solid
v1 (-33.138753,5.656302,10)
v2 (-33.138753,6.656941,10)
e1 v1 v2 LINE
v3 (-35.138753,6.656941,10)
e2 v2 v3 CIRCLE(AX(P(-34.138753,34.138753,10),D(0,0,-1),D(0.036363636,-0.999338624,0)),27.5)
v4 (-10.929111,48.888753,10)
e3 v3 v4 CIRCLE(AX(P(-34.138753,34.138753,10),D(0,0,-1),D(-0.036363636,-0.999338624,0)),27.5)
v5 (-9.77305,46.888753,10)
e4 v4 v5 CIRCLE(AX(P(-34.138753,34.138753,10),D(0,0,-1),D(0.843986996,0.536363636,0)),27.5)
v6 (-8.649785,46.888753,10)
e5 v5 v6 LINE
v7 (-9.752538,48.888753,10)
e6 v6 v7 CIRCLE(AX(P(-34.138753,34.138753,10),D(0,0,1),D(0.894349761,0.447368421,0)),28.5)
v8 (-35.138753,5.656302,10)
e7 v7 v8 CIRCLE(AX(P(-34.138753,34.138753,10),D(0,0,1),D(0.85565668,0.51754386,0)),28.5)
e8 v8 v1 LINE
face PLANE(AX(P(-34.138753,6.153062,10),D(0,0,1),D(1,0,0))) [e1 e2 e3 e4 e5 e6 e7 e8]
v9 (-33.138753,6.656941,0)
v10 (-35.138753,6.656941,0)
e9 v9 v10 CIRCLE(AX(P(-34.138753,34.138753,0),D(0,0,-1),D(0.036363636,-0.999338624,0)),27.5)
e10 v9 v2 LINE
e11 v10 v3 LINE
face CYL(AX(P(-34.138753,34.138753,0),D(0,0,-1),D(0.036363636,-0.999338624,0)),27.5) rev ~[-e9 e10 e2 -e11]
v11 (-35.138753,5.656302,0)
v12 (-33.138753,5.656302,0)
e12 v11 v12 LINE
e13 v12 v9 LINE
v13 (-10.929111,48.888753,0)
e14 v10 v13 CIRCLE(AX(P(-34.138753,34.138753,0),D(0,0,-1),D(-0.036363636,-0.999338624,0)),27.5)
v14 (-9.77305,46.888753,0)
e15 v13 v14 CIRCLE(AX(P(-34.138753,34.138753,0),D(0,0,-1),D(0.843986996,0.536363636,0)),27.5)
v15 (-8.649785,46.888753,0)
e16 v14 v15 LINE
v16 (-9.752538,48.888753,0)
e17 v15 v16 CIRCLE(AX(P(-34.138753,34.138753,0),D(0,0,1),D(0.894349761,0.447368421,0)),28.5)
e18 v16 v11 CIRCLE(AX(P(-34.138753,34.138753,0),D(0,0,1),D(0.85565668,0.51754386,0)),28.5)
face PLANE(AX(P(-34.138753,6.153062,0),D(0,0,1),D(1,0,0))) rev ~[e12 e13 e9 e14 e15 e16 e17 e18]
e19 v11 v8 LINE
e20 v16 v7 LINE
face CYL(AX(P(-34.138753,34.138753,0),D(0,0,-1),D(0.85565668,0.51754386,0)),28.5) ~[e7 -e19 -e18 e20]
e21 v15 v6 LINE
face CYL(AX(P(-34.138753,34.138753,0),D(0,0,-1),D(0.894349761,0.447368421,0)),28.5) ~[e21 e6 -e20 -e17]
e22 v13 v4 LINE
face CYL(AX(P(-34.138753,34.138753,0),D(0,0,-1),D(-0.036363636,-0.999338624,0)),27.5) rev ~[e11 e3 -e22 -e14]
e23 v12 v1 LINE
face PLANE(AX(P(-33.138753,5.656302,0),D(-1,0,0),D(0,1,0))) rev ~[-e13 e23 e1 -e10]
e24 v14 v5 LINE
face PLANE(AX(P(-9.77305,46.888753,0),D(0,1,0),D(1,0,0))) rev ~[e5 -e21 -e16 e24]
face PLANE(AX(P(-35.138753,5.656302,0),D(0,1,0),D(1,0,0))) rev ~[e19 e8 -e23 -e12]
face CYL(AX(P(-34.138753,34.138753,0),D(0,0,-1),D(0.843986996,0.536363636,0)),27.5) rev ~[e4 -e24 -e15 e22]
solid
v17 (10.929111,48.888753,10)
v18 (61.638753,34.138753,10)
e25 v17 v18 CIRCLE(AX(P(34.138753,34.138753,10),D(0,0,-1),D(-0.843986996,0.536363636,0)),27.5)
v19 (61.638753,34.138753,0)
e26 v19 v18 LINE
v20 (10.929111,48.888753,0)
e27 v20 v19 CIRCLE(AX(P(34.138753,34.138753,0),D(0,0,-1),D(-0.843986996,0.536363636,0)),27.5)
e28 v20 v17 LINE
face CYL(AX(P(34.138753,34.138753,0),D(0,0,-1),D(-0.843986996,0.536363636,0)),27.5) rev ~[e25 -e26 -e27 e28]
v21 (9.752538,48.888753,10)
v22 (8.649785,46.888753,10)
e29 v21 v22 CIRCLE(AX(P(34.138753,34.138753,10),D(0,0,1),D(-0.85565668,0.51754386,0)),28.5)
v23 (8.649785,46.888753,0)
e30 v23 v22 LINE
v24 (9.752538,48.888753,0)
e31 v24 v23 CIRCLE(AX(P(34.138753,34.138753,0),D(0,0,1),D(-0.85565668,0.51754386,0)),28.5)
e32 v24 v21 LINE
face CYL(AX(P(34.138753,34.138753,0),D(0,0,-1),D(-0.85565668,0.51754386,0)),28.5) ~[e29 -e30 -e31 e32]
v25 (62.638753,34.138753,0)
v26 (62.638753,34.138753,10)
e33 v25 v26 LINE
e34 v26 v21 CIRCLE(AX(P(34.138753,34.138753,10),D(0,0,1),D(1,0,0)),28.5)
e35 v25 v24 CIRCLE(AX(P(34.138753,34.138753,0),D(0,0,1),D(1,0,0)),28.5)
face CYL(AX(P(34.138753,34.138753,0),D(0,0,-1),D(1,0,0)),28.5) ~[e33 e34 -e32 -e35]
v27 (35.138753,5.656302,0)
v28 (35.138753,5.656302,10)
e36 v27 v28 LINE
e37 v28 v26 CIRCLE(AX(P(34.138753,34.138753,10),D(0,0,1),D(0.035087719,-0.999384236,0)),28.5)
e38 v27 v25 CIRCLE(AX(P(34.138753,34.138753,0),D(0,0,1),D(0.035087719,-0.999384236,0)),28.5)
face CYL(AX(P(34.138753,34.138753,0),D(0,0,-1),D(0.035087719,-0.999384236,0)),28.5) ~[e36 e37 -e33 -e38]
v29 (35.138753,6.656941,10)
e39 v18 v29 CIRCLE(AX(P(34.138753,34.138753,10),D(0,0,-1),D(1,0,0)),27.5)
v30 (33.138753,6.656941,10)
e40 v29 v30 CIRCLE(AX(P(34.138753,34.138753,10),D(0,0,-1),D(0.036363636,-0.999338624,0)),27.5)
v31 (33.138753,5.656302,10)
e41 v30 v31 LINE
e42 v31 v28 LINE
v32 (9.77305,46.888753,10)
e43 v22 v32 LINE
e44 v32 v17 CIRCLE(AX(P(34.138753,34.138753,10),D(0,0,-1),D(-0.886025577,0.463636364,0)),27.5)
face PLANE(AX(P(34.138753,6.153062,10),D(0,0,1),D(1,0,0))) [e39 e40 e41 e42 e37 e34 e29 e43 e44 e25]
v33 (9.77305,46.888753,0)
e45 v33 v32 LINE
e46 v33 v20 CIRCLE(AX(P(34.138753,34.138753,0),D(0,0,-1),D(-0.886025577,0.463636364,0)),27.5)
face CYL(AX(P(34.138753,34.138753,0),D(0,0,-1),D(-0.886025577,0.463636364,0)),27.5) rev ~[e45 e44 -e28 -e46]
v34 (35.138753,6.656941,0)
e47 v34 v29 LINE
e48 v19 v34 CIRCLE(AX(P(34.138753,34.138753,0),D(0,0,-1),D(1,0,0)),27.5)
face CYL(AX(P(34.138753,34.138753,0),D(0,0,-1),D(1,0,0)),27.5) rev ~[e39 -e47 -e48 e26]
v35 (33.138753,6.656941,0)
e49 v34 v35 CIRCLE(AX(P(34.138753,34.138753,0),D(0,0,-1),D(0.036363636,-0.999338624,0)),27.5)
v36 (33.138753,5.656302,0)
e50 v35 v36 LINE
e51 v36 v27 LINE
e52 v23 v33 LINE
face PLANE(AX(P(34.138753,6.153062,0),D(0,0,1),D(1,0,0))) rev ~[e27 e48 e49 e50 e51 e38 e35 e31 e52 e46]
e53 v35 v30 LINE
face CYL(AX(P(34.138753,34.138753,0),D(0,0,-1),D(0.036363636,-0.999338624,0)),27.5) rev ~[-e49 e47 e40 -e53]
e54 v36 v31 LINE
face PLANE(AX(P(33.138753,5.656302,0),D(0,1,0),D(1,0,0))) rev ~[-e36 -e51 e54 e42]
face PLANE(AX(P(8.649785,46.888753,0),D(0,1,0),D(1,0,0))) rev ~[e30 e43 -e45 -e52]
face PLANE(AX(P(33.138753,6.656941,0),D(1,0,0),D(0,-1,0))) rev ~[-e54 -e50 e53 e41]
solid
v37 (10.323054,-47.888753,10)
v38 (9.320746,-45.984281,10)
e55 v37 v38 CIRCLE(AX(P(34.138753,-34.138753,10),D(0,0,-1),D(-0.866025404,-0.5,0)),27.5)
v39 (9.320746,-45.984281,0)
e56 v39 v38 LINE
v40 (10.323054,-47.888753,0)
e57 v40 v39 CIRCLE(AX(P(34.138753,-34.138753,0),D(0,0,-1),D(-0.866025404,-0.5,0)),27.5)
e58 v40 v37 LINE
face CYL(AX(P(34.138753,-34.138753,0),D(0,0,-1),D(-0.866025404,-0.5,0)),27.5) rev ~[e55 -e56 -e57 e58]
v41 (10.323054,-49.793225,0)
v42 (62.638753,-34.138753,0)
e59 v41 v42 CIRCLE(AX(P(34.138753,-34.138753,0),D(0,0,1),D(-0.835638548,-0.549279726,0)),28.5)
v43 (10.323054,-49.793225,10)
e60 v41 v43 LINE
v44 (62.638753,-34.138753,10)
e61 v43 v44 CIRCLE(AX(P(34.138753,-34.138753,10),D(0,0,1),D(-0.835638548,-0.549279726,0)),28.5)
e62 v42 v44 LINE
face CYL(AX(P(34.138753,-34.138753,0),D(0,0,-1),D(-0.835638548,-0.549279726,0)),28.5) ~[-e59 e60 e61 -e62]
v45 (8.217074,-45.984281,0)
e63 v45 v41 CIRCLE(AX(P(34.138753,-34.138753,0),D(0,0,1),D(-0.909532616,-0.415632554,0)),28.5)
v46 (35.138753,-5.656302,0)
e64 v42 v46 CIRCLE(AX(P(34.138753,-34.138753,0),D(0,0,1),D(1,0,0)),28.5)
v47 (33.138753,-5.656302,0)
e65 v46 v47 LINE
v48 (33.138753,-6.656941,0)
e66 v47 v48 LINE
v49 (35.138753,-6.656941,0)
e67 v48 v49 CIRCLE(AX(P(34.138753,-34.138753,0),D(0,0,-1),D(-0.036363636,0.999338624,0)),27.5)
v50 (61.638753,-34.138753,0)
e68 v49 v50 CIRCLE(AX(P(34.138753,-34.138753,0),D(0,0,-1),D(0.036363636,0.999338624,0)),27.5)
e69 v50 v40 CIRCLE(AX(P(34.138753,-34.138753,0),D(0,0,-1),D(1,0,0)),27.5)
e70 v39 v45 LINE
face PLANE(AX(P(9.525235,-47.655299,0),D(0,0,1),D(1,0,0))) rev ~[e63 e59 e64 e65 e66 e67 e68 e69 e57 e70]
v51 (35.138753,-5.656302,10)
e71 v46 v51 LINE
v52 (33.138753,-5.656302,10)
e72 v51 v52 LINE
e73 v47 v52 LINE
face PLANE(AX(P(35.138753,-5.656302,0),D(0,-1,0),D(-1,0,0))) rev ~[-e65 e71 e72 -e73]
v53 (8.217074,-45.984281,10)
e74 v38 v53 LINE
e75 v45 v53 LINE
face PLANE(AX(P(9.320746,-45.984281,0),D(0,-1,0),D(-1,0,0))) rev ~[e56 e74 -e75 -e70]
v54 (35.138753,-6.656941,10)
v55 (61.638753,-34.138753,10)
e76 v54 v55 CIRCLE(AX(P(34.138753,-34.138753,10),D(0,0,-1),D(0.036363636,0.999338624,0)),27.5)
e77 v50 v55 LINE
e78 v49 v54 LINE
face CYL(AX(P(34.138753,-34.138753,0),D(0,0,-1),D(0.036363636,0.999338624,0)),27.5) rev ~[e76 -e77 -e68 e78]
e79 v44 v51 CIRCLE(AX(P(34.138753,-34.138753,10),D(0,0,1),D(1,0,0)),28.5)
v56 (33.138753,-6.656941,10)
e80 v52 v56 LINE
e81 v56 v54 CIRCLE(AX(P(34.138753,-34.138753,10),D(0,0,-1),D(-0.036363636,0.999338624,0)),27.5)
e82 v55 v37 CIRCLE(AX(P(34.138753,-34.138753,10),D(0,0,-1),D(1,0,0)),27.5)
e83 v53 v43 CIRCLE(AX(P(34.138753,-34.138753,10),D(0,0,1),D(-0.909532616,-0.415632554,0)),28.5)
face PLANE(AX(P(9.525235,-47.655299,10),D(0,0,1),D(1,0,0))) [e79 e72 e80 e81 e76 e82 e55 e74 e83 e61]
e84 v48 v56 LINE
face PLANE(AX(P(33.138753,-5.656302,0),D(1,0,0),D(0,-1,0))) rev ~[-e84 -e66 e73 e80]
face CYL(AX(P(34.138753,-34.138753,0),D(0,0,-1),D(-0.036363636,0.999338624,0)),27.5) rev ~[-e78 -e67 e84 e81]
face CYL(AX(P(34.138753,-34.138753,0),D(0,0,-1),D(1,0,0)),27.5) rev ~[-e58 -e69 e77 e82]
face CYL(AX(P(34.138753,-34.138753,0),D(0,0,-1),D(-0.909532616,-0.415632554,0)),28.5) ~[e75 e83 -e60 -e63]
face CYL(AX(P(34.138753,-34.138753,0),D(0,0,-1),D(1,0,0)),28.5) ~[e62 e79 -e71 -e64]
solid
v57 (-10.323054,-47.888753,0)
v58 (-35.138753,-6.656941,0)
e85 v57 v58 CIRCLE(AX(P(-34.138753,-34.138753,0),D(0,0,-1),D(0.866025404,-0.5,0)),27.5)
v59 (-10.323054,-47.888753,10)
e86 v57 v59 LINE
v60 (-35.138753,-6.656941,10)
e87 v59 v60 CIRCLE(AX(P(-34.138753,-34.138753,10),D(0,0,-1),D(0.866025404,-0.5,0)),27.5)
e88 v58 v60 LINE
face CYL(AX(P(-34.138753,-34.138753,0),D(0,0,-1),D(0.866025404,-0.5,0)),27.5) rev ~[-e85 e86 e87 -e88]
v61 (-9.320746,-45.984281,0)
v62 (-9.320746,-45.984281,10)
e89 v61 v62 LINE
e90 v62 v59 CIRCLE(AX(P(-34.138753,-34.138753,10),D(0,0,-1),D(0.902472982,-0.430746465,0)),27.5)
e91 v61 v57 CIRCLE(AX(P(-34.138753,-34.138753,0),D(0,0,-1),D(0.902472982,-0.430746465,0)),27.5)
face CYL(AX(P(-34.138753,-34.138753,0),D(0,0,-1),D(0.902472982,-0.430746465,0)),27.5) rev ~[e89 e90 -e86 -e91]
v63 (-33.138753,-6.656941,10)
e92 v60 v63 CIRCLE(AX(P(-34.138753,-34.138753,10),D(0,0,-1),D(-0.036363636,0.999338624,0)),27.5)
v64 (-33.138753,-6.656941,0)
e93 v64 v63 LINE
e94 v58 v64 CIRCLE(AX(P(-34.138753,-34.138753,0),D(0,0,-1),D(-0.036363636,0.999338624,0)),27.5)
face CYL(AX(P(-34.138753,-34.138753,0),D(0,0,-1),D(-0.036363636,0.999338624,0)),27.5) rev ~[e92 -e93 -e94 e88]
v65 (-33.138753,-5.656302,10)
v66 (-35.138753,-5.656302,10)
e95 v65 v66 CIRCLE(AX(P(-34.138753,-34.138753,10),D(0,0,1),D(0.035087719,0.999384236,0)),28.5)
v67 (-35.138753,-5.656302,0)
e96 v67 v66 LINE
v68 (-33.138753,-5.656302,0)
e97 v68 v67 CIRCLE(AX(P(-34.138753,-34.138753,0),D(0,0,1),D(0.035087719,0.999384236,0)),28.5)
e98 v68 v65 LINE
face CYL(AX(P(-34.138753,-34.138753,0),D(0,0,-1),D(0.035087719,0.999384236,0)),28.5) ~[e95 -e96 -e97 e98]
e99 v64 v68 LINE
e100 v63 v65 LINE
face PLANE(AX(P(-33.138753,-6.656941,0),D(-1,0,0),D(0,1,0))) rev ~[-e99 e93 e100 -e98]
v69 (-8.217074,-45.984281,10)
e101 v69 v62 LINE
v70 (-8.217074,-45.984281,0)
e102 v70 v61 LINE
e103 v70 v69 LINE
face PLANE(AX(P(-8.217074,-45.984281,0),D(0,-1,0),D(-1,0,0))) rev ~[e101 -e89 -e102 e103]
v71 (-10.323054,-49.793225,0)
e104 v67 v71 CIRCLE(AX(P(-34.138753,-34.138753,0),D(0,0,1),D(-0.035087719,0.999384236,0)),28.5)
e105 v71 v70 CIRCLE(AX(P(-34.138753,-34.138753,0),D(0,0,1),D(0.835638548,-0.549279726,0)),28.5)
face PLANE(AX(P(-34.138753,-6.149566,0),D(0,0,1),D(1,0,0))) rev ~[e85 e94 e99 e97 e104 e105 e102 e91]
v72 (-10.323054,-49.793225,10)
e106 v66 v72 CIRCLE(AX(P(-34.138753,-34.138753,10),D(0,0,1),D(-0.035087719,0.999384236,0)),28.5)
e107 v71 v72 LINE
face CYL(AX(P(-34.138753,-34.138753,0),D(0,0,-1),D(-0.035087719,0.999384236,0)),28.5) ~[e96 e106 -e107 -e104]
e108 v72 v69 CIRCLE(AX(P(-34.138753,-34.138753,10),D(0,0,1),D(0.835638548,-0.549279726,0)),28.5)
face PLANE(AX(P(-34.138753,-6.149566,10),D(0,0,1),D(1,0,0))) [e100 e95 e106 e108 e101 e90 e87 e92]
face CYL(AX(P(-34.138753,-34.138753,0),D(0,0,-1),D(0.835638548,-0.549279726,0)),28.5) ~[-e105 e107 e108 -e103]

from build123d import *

# Parameters (mm, degrees)
F1_DEPTH = 10


with BuildPart() as f1:
    # F0 (on Top) → F1 (new body)
    with BuildSketch(Plane.XY):
        with BuildLine():
            ThreePointArc((-35.1387531032, -6.6569409359), (-34.1387531032, -6.6387531032), (-33.1387531032, -6.6569409359))
            Line((-33.1387531032, -6.6569409359), (-33.1387531032, -5.6563023659))
            ThreePointArc((-33.1387531032, -5.6563023659), (-34.1387531032, -5.6387531032), (-35.1387531032, -5.6563023659))
            Line((-35.1387531032, -5.6563023659), (-35.1387531032, -6.6569409359))
        make_face()
        with BuildLine():
            Line((-8.2170735426, -45.9842808987), (-9.3207461074, -45.9842808987))
            ThreePointArc((-9.3207461074, -45.9842808987), (-9.8032628947, -46.9463257191), (-10.3230544991, -47.8887531032))
            Line((-10.3230544991, -47.8887531032), (-10.3230544991, -49.7932253077))
            ThreePointArc((-10.3230544991, -49.7932253077), (-9.1972473136, -47.9290137587), (-8.2170735426, -45.9842808987))
        make_face()
        with BuildLine():
            ThreePointArc((-10.3230544991, -47.8887531032), (-57.7004722542, -48.3195637518), (-35.1387531032, -6.6569409359))
            Line((-35.1387531032, -6.6569409359), (-35.1387531032, -5.6563023659))
            ThreePointArc((-35.1387531032, -5.6563023659), (-58.9813781132, -48.1063578589), (-10.3230544991, -49.7932253077))
            Line((-10.3230544991, -49.7932253077), (-10.3230544991, -47.8887531032))
        make_face()
    extrude(amount=F1_DEPTH)


with BuildPart() as f1b:
    # F0 (on Top) → F1, piece 2 (new body)
    with BuildSketch(Plane.XY):
        with BuildLine():
            Line((9.3207461074, -45.9842808987), (8.2170735426, -45.9842808987))
            ThreePointArc((8.2170735426, -45.9842808987), (9.1972473136, -47.9290137587), (10.3230544991, -49.7932253077))
            Line((10.3230544991, -49.7932253077), (10.3230544991, -47.8887531032))
            ThreePointArc((10.3230544991, -47.8887531032), (9.8032628947, -46.9463257191), (9.3207461074, -45.9842808987))
        make_face()
        with BuildLine():
            Line((10.3230544991, -47.8887531032), (10.3230544991, -49.7932253077))
            ThreePointArc((10.3230544991, -49.7932253077), (42.3088996681, -61.4425752735), (62.6387531032, -34.1387531032))
            ThreePointArc((62.6387531032, -34.1387531032), (54.641801657, -14.3429202084), (35.1387531032, -5.6563023659))
            Line((35.1387531032, -5.6563023659), (35.1387531032, -6.6569409359))
            ThreePointArc((35.1387531032, -6.6569409359), (53.934585998, -15.0501439344), (61.6387531032, -34.1387531032))
            ThreePointArc((61.6387531032, -34.1387531032), (41.2562768435, -60.7017133261), (10.3230544991, -47.8887531032))
        make_face()
        with BuildLine():
            Line((35.1387531032, -5.6563023659), (33.1387531032, -5.6563023659))
            Line((33.1387531032, -5.6563023659), (33.1387531032, -6.6569409359))
            ThreePointArc((33.1387531032, -6.6569409359), (34.1387531032, -6.6387531032), (35.1387531032, -6.6569409359))
            Line((35.1387531032, -6.6569409359), (35.1387531032, -5.6563023659))
        make_face()
    extrude(amount=F1_DEPTH)


with BuildPart() as f1c:
    # F0 (on Top) → F1, piece 3 (new body)
    with BuildSketch(Plane.XY):
        with BuildLine():
            Line((-35.1387531032, 5.6563023659), (-33.1387531032, 5.6563023659))
            Line((-33.1387531032, 5.6563023659), (-33.1387531032, 6.6569409359))
            ThreePointArc((-33.1387531032, 6.6569409359), (-34.1387531032, 6.6387531032), (-35.1387531032, 6.6569409359))
            Line((-35.1387531032, 6.6569409359), (-35.1387531032, 5.6563023659))
        make_face()
        with BuildLine():
            ThreePointArc((-9.7525377347, 48.8887531032), (-58.7149604286, 48.5699704287), (-35.1387531032, 5.6563023659))
            Line((-35.1387531032, 5.6563023659), (-35.1387531032, 6.6569409359))
            ThreePointArc((-35.1387531032, 6.6569409359), (-57.996635313, 47.8154287396), (-10.9291107104, 48.8887531032))
            Line((-10.9291107104, 48.8887531032), (-9.7525377347, 48.8887531032))
        make_face()
        with BuildLine():
            ThreePointArc((-8.6497849012, 46.8887531032), (-9.1811193202, 47.8998037881), (-9.7525377347, 48.8887531032))
            Line((-9.7525377347, 48.8887531032), (-10.9291107104, 48.8887531032))
            ThreePointArc((-10.9291107104, 48.8887531032), (-10.3300702173, 47.9008975305), (-9.7730497479, 46.8887531032))
            Line((-9.7730497479, 46.8887531032), (-8.6497849012, 46.8887531032))
        make_face()
    extrude(amount=F1_DEPTH)


with BuildPart() as f1d:
    # F0 (on Top) → F1, piece 4 (new body)
    with BuildSketch(Plane.XY):
        with BuildLine():
            Line((33.1387531032, 6.6569409359), (33.1387531032, 5.6563023659))
            Line((33.1387531032, 5.6563023659), (35.1387531032, 5.6563023659))
            Line((35.1387531032, 5.6563023659), (35.1387531032, 6.6569409359))
            ThreePointArc((35.1387531032, 6.6569409359), (34.1387531032, 6.6387531032), (33.1387531032, 6.6569409359))
        make_face()
        with BuildLine():
            Line((10.9291107104, 48.8887531032), (9.7525377347, 48.8887531032))
            ThreePointArc((9.7525377347, 48.8887531032), (9.1811193202, 47.8998037881), (8.6497849012, 46.8887531032))
            Line((8.6497849012, 46.8887531032), (9.7730497479, 46.8887531032))
            ThreePointArc((9.7730497479, 46.8887531032), (10.3300702173, 47.9008975305), (10.9291107104, 48.8887531032))
        make_face()
        with BuildLine():
            ThreePointArc((62.6387531032, 34.1387531032), (41.7952164512, 61.591049346), (9.7525377347, 48.8887531032))
            Line((9.7525377347, 48.8887531032), (10.9291107104, 48.8887531032))
            ThreePointArc((10.9291107104, 48.8887531032), (41.8194052304, 60.5443885415), (61.6387531032, 34.1387531032))
            ThreePointArc((61.6387531032, 34.1387531032), (53.934585998, 15.0501439344), (35.1387531032, 6.6569409359))
            Line((35.1387531032, 6.6569409359), (35.1387531032, 5.6563023659))
            ThreePointArc((35.1387531032, 5.6563023659), (54.641801657, 14.3429202084), (62.6387531032, 34.1387531032))
        make_face()
    extrude(amount=F1_DEPTH)


solid = Compound([f1.part, f1b.part, f1c.part, f1d.part])
